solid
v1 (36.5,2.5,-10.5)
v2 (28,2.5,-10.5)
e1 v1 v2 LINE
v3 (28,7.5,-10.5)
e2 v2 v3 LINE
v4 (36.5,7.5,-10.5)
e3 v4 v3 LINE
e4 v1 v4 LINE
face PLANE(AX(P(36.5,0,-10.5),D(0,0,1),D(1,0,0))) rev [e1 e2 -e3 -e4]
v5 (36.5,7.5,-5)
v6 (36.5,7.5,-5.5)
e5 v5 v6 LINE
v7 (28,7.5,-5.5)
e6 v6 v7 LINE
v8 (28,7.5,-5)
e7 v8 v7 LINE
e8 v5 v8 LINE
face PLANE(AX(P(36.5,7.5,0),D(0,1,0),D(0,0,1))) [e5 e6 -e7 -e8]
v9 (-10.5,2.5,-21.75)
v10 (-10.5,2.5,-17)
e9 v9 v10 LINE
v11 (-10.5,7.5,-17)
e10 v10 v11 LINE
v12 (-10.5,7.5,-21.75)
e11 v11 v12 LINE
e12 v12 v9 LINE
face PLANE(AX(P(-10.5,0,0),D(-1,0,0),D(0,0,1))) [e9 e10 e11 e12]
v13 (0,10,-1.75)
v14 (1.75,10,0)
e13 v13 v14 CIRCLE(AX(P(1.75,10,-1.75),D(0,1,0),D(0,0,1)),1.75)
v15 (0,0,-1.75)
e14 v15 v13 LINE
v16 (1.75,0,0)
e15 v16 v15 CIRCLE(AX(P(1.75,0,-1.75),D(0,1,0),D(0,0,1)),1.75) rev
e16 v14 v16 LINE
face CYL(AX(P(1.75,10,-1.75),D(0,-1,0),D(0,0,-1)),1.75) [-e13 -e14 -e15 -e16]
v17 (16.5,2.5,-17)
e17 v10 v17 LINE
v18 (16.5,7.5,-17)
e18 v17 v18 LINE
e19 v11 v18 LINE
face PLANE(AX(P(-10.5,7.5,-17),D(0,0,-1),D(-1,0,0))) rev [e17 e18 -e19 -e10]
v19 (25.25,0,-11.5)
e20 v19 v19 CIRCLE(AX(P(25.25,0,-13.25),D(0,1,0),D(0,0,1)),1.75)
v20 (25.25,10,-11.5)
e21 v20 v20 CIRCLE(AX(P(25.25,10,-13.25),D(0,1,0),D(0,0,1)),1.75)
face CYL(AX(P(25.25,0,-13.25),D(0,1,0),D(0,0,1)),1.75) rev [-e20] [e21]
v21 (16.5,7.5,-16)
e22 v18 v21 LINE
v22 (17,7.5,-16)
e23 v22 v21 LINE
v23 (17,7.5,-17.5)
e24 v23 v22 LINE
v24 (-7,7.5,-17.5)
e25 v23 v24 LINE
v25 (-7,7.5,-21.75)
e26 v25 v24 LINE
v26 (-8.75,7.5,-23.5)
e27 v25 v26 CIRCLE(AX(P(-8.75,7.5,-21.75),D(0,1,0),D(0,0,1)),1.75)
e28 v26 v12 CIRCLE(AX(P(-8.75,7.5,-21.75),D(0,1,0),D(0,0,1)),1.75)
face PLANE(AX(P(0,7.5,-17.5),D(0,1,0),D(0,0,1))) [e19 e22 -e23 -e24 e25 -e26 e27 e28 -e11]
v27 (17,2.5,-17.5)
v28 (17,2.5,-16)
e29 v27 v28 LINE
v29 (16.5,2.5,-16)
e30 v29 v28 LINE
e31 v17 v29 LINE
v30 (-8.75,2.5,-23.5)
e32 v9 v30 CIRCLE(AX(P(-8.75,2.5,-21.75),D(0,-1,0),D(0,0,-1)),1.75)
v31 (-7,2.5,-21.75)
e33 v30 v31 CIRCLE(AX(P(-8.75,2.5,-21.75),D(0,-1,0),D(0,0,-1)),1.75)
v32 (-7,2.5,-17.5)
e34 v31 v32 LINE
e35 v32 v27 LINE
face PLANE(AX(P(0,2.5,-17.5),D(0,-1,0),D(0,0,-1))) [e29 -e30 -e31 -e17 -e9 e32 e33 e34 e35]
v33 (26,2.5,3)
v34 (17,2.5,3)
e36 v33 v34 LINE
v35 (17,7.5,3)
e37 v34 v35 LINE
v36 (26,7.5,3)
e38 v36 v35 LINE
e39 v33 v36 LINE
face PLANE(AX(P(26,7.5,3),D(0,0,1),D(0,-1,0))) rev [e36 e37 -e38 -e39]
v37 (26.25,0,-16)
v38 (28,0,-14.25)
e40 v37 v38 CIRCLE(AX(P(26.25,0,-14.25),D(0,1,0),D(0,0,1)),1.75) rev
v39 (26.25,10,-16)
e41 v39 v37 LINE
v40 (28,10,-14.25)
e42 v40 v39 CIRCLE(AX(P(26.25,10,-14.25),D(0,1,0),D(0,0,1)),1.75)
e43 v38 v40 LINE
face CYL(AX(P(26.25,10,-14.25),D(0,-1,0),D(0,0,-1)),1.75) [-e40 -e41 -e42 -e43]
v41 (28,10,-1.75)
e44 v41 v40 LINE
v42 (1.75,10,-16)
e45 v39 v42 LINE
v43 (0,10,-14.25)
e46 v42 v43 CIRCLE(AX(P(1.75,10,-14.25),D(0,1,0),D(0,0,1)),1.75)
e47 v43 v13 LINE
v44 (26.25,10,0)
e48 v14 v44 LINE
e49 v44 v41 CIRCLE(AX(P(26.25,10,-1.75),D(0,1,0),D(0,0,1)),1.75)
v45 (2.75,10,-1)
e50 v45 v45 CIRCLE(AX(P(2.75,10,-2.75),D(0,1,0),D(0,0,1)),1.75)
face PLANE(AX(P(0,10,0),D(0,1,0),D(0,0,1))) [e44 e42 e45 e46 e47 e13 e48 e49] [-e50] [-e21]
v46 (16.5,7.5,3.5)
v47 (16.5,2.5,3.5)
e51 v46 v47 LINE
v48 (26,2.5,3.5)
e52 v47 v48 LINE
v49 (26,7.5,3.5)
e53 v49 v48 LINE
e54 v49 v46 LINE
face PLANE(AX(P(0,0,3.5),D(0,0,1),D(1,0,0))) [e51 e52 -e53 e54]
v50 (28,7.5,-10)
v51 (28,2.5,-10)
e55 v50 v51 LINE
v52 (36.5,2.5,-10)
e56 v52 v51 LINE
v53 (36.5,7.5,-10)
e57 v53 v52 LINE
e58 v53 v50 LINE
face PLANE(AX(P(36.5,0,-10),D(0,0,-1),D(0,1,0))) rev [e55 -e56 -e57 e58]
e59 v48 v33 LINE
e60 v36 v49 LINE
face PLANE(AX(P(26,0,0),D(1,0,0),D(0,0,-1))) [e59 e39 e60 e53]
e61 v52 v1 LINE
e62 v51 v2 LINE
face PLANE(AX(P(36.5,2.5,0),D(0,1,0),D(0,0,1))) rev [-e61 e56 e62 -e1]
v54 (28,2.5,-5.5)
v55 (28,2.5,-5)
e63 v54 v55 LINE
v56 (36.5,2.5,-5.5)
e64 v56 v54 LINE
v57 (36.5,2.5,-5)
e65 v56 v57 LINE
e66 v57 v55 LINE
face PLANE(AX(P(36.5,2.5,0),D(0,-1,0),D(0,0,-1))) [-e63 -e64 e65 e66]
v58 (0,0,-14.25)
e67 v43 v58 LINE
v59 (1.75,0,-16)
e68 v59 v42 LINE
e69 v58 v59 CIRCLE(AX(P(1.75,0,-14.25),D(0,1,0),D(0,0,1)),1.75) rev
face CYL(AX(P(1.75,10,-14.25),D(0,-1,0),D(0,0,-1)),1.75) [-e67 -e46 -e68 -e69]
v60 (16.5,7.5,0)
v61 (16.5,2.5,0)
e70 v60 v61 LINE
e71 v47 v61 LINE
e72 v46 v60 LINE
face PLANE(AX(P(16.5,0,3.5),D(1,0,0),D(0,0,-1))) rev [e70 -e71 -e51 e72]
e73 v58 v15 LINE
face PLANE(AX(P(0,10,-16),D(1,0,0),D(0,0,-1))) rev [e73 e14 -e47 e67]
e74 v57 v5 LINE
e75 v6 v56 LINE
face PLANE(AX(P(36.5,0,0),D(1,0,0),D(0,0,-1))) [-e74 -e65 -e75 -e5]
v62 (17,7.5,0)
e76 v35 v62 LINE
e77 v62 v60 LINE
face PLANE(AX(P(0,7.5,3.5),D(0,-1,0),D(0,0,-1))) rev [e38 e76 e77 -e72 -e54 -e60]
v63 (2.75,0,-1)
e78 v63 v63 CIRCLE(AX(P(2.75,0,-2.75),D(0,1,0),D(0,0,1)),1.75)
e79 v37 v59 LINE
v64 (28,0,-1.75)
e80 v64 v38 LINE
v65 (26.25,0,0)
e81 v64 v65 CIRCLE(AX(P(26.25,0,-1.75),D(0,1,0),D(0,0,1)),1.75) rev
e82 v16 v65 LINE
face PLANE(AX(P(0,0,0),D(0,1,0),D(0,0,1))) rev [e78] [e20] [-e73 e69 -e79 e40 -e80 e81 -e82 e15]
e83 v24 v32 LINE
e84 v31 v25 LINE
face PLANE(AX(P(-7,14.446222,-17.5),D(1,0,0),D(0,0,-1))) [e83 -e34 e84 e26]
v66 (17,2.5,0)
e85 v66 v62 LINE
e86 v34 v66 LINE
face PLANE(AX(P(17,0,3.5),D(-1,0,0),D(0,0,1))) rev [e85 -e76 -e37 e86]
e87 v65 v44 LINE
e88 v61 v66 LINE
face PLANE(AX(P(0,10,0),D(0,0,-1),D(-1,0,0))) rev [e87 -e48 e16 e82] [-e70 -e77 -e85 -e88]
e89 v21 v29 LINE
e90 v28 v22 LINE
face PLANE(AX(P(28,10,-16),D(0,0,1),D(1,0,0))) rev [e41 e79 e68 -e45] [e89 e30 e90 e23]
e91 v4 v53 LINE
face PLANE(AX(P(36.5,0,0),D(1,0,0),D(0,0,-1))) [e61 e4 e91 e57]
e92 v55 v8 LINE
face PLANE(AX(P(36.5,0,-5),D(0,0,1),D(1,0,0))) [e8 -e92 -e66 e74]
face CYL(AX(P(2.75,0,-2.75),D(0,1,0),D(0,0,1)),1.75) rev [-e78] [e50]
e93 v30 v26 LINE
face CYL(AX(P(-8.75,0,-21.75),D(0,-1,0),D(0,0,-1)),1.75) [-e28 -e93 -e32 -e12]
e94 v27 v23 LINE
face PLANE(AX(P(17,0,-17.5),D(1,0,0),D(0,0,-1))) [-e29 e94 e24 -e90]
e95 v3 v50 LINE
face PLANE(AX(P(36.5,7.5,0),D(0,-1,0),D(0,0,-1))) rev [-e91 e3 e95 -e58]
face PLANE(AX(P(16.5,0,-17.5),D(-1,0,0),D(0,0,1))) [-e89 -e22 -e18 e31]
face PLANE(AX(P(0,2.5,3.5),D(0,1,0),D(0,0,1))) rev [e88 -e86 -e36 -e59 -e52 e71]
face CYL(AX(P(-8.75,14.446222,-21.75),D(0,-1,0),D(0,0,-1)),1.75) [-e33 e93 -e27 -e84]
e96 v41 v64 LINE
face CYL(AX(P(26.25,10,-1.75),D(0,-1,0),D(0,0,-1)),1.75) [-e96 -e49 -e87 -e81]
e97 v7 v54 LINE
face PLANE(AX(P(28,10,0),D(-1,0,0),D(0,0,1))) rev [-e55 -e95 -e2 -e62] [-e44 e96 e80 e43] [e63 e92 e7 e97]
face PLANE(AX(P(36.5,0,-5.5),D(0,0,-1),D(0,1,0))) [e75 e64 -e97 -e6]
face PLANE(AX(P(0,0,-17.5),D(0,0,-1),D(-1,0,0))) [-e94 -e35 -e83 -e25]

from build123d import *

# Parameters (mm, degrees)
SKETCH1_W           = 28
SKETCH1_H           = 16
BOSS_EXTRUDE1_DEPTH = 10
BOSS_EXTRUDE2_DEPTH = 1.5
SKETCH4_W           = 0.5
SKETCH4_H           = 5
BOSS_EXTRUDE3_DEPTH = 27
SKETCH6_W           = 3.5
SKETCH6_H           = 6
BOSS_EXTRUDE4_DEPTH = 5
FILLET1_R           = 1.75
BOSS_EXTRUDE5_DEPTH = 3.5
SKETCH8_W           = 0.5
SKETCH8_H           = 5
BOSS_EXTRUDE6_DEPTH = 9
BOSS_EXTRUDE7_DEPTH = 8.5
CUT_EXTRUDE1_DEPTH  = 45.547727215
CUT_EXTRUDE2_DEPTH  = 45.547727215
FILLET2_R           = 1.75


with BuildPart() as part:
    # Sketch1 → Boss-Extrude1 (new body)
    with BuildSketch(Plane(origin=(0, 0, 0), x_dir=(1, 0, 0), z_dir=(0, 1, 0))):
        with Locations((14, 8)):
            Rectangle(SKETCH1_W, SKETCH1_H)
    extrude(amount=BOSS_EXTRUDE1_DEPTH)

    # Sketch3 → Boss-Extrude2 (add)
    with BuildSketch(Plane(origin=(0, 0, -16), x_dir=(-1, 0, 0), z_dir=(0, 0, -1))):
        Polygon((-17, 2.5), (-17, 5), (-17, 7.5), (-16.5, 7.5), (-16.5, 2.5), align=None)
    extrude(amount=BOSS_EXTRUDE2_DEPTH)

    # Sketch4 → Boss-Extrude3 (add)
    with BuildSketch(Plane.ZY.offset(-16.5)):
        with Locations((-17.25, 5)):
            Rectangle(SKETCH4_W, SKETCH4_H)
    extrude(amount=BOSS_EXTRUDE3_DEPTH)

    # Sketch6 → Boss-Extrude4 (add)
    with BuildSketch(Plane.XZ.offset(-2.5)):
        with Locations((-8.75, -20.5)):
            Rectangle(SKETCH6_W, SKETCH6_H)
    extrude(amount=-BOSS_EXTRUDE4_DEPTH)

    # Fillet1
    fillet1_edges = [part.edges().sort_by_distance(p)[0] for p in [
        (-7, 5, -23.5),
        (-10.5, 5, -23.5),
    ]]
    fillet(fillet1_edges, radius=FILLET1_R - 0.0001)  # a hair under: the kernel refuses the full size

    # Sketch7 → Boss-Extrude5 (add)
    with BuildSketch(Plane.XY):
        Polygon((16.5, 2.5), (17, 2.5), (17, 5), (17, 7.5), (16.5, 7.5), align=None)
    extrude(amount=BOSS_EXTRUDE5_DEPTH)

    # Sketch8 → Boss-Extrude6 (add)
    with BuildSketch(Plane(origin=(17, 0, 0), x_dir=(0, 0, -1), z_dir=(1, 0, 0))):
        with Locations((-3.25, 5)):
            Rectangle(SKETCH8_W, SKETCH8_H)
    extrude(amount=BOSS_EXTRUDE6_DEPTH)

    # Sketch9 → Boss-Extrude7 (add)
    with BuildSketch(Plane(origin=(28, 0, 0), x_dir=(0, 0, -1), z_dir=(1, 0, 0))):
        Polygon((10, 2.5), (10.5, 2.5), (10.5, 5), (10.5, 7.5), (10, 7.5), align=None)
        Polygon((5, 5), (5, 7.5), (5.5, 7.5), (5.5, 2.5), (5, 2.5), align=None)
    extrude(amount=BOSS_EXTRUDE7_DEPTH)

    # Sketch10 → Cut-Extrude1 (cut, through all)
    with BuildSketch(Plane(origin=(0, 10, 0), x_dir=(1, 0, 0), z_dir=(0, 1, 0))):
        with BuildLine():
            ThreePointArc((25.25, 15), (24.012563133, 12.012563133), (27, 13.25))
            Line((27, 13.25), (25.25, 13.25))
            Line((25.25, 13.25), (25.25, 15))
        make_face()
        with BuildLine():
            Line((25.25, 13.25), (27, 13.25))
            ThreePointArc((27, 13.25), (26.487436867, 14.487436867), (25.25, 15))
            Line((25.25, 15), (25.25, 13.25))
        make_face()
    extrude(amount=-CUT_EXTRUDE1_DEPTH, mode=Mode.SUBTRACT)

    # Sketch11 → Cut-Extrude2 (cut, through all)
    with BuildSketch(Plane(origin=(0, 10, 0), x_dir=(1, 0, 0), z_dir=(0, 1, 0))):
        with BuildLine():
            ThreePointArc((4.5, 2.75), (2.75, 4.5), (1, 2.75))
            Line((1, 2.75), (2.75, 2.75))
            Line((2.75, 2.75), (2.75, 1))
            ThreePointArc((2.75, 1), (3.987436867, 1.512563133), (4.5, 2.75))
        make_face()
        with BuildLine():
            Line((2.75, 2.75), (1, 2.75))
            ThreePointArc((1, 2.75), (1.512563133, 1.512563133), (2.75, 1))
            Line((2.75, 1), (2.75, 2.75))
        make_face()
    extrude(amount=-CUT_EXTRUDE2_DEPTH, mode=Mode.SUBTRACT)

    # Fillet2
    fillet2_edges = [part.edges().sort_by_distance(p)[0] for p in [
        (0, 5, -16),
        (28, 5, -16),
        (28, 5, 0),
        (0, 5, 0),
    ]]
    fillet(fillet2_edges, radius=FILLET2_R)


solid = part.part
